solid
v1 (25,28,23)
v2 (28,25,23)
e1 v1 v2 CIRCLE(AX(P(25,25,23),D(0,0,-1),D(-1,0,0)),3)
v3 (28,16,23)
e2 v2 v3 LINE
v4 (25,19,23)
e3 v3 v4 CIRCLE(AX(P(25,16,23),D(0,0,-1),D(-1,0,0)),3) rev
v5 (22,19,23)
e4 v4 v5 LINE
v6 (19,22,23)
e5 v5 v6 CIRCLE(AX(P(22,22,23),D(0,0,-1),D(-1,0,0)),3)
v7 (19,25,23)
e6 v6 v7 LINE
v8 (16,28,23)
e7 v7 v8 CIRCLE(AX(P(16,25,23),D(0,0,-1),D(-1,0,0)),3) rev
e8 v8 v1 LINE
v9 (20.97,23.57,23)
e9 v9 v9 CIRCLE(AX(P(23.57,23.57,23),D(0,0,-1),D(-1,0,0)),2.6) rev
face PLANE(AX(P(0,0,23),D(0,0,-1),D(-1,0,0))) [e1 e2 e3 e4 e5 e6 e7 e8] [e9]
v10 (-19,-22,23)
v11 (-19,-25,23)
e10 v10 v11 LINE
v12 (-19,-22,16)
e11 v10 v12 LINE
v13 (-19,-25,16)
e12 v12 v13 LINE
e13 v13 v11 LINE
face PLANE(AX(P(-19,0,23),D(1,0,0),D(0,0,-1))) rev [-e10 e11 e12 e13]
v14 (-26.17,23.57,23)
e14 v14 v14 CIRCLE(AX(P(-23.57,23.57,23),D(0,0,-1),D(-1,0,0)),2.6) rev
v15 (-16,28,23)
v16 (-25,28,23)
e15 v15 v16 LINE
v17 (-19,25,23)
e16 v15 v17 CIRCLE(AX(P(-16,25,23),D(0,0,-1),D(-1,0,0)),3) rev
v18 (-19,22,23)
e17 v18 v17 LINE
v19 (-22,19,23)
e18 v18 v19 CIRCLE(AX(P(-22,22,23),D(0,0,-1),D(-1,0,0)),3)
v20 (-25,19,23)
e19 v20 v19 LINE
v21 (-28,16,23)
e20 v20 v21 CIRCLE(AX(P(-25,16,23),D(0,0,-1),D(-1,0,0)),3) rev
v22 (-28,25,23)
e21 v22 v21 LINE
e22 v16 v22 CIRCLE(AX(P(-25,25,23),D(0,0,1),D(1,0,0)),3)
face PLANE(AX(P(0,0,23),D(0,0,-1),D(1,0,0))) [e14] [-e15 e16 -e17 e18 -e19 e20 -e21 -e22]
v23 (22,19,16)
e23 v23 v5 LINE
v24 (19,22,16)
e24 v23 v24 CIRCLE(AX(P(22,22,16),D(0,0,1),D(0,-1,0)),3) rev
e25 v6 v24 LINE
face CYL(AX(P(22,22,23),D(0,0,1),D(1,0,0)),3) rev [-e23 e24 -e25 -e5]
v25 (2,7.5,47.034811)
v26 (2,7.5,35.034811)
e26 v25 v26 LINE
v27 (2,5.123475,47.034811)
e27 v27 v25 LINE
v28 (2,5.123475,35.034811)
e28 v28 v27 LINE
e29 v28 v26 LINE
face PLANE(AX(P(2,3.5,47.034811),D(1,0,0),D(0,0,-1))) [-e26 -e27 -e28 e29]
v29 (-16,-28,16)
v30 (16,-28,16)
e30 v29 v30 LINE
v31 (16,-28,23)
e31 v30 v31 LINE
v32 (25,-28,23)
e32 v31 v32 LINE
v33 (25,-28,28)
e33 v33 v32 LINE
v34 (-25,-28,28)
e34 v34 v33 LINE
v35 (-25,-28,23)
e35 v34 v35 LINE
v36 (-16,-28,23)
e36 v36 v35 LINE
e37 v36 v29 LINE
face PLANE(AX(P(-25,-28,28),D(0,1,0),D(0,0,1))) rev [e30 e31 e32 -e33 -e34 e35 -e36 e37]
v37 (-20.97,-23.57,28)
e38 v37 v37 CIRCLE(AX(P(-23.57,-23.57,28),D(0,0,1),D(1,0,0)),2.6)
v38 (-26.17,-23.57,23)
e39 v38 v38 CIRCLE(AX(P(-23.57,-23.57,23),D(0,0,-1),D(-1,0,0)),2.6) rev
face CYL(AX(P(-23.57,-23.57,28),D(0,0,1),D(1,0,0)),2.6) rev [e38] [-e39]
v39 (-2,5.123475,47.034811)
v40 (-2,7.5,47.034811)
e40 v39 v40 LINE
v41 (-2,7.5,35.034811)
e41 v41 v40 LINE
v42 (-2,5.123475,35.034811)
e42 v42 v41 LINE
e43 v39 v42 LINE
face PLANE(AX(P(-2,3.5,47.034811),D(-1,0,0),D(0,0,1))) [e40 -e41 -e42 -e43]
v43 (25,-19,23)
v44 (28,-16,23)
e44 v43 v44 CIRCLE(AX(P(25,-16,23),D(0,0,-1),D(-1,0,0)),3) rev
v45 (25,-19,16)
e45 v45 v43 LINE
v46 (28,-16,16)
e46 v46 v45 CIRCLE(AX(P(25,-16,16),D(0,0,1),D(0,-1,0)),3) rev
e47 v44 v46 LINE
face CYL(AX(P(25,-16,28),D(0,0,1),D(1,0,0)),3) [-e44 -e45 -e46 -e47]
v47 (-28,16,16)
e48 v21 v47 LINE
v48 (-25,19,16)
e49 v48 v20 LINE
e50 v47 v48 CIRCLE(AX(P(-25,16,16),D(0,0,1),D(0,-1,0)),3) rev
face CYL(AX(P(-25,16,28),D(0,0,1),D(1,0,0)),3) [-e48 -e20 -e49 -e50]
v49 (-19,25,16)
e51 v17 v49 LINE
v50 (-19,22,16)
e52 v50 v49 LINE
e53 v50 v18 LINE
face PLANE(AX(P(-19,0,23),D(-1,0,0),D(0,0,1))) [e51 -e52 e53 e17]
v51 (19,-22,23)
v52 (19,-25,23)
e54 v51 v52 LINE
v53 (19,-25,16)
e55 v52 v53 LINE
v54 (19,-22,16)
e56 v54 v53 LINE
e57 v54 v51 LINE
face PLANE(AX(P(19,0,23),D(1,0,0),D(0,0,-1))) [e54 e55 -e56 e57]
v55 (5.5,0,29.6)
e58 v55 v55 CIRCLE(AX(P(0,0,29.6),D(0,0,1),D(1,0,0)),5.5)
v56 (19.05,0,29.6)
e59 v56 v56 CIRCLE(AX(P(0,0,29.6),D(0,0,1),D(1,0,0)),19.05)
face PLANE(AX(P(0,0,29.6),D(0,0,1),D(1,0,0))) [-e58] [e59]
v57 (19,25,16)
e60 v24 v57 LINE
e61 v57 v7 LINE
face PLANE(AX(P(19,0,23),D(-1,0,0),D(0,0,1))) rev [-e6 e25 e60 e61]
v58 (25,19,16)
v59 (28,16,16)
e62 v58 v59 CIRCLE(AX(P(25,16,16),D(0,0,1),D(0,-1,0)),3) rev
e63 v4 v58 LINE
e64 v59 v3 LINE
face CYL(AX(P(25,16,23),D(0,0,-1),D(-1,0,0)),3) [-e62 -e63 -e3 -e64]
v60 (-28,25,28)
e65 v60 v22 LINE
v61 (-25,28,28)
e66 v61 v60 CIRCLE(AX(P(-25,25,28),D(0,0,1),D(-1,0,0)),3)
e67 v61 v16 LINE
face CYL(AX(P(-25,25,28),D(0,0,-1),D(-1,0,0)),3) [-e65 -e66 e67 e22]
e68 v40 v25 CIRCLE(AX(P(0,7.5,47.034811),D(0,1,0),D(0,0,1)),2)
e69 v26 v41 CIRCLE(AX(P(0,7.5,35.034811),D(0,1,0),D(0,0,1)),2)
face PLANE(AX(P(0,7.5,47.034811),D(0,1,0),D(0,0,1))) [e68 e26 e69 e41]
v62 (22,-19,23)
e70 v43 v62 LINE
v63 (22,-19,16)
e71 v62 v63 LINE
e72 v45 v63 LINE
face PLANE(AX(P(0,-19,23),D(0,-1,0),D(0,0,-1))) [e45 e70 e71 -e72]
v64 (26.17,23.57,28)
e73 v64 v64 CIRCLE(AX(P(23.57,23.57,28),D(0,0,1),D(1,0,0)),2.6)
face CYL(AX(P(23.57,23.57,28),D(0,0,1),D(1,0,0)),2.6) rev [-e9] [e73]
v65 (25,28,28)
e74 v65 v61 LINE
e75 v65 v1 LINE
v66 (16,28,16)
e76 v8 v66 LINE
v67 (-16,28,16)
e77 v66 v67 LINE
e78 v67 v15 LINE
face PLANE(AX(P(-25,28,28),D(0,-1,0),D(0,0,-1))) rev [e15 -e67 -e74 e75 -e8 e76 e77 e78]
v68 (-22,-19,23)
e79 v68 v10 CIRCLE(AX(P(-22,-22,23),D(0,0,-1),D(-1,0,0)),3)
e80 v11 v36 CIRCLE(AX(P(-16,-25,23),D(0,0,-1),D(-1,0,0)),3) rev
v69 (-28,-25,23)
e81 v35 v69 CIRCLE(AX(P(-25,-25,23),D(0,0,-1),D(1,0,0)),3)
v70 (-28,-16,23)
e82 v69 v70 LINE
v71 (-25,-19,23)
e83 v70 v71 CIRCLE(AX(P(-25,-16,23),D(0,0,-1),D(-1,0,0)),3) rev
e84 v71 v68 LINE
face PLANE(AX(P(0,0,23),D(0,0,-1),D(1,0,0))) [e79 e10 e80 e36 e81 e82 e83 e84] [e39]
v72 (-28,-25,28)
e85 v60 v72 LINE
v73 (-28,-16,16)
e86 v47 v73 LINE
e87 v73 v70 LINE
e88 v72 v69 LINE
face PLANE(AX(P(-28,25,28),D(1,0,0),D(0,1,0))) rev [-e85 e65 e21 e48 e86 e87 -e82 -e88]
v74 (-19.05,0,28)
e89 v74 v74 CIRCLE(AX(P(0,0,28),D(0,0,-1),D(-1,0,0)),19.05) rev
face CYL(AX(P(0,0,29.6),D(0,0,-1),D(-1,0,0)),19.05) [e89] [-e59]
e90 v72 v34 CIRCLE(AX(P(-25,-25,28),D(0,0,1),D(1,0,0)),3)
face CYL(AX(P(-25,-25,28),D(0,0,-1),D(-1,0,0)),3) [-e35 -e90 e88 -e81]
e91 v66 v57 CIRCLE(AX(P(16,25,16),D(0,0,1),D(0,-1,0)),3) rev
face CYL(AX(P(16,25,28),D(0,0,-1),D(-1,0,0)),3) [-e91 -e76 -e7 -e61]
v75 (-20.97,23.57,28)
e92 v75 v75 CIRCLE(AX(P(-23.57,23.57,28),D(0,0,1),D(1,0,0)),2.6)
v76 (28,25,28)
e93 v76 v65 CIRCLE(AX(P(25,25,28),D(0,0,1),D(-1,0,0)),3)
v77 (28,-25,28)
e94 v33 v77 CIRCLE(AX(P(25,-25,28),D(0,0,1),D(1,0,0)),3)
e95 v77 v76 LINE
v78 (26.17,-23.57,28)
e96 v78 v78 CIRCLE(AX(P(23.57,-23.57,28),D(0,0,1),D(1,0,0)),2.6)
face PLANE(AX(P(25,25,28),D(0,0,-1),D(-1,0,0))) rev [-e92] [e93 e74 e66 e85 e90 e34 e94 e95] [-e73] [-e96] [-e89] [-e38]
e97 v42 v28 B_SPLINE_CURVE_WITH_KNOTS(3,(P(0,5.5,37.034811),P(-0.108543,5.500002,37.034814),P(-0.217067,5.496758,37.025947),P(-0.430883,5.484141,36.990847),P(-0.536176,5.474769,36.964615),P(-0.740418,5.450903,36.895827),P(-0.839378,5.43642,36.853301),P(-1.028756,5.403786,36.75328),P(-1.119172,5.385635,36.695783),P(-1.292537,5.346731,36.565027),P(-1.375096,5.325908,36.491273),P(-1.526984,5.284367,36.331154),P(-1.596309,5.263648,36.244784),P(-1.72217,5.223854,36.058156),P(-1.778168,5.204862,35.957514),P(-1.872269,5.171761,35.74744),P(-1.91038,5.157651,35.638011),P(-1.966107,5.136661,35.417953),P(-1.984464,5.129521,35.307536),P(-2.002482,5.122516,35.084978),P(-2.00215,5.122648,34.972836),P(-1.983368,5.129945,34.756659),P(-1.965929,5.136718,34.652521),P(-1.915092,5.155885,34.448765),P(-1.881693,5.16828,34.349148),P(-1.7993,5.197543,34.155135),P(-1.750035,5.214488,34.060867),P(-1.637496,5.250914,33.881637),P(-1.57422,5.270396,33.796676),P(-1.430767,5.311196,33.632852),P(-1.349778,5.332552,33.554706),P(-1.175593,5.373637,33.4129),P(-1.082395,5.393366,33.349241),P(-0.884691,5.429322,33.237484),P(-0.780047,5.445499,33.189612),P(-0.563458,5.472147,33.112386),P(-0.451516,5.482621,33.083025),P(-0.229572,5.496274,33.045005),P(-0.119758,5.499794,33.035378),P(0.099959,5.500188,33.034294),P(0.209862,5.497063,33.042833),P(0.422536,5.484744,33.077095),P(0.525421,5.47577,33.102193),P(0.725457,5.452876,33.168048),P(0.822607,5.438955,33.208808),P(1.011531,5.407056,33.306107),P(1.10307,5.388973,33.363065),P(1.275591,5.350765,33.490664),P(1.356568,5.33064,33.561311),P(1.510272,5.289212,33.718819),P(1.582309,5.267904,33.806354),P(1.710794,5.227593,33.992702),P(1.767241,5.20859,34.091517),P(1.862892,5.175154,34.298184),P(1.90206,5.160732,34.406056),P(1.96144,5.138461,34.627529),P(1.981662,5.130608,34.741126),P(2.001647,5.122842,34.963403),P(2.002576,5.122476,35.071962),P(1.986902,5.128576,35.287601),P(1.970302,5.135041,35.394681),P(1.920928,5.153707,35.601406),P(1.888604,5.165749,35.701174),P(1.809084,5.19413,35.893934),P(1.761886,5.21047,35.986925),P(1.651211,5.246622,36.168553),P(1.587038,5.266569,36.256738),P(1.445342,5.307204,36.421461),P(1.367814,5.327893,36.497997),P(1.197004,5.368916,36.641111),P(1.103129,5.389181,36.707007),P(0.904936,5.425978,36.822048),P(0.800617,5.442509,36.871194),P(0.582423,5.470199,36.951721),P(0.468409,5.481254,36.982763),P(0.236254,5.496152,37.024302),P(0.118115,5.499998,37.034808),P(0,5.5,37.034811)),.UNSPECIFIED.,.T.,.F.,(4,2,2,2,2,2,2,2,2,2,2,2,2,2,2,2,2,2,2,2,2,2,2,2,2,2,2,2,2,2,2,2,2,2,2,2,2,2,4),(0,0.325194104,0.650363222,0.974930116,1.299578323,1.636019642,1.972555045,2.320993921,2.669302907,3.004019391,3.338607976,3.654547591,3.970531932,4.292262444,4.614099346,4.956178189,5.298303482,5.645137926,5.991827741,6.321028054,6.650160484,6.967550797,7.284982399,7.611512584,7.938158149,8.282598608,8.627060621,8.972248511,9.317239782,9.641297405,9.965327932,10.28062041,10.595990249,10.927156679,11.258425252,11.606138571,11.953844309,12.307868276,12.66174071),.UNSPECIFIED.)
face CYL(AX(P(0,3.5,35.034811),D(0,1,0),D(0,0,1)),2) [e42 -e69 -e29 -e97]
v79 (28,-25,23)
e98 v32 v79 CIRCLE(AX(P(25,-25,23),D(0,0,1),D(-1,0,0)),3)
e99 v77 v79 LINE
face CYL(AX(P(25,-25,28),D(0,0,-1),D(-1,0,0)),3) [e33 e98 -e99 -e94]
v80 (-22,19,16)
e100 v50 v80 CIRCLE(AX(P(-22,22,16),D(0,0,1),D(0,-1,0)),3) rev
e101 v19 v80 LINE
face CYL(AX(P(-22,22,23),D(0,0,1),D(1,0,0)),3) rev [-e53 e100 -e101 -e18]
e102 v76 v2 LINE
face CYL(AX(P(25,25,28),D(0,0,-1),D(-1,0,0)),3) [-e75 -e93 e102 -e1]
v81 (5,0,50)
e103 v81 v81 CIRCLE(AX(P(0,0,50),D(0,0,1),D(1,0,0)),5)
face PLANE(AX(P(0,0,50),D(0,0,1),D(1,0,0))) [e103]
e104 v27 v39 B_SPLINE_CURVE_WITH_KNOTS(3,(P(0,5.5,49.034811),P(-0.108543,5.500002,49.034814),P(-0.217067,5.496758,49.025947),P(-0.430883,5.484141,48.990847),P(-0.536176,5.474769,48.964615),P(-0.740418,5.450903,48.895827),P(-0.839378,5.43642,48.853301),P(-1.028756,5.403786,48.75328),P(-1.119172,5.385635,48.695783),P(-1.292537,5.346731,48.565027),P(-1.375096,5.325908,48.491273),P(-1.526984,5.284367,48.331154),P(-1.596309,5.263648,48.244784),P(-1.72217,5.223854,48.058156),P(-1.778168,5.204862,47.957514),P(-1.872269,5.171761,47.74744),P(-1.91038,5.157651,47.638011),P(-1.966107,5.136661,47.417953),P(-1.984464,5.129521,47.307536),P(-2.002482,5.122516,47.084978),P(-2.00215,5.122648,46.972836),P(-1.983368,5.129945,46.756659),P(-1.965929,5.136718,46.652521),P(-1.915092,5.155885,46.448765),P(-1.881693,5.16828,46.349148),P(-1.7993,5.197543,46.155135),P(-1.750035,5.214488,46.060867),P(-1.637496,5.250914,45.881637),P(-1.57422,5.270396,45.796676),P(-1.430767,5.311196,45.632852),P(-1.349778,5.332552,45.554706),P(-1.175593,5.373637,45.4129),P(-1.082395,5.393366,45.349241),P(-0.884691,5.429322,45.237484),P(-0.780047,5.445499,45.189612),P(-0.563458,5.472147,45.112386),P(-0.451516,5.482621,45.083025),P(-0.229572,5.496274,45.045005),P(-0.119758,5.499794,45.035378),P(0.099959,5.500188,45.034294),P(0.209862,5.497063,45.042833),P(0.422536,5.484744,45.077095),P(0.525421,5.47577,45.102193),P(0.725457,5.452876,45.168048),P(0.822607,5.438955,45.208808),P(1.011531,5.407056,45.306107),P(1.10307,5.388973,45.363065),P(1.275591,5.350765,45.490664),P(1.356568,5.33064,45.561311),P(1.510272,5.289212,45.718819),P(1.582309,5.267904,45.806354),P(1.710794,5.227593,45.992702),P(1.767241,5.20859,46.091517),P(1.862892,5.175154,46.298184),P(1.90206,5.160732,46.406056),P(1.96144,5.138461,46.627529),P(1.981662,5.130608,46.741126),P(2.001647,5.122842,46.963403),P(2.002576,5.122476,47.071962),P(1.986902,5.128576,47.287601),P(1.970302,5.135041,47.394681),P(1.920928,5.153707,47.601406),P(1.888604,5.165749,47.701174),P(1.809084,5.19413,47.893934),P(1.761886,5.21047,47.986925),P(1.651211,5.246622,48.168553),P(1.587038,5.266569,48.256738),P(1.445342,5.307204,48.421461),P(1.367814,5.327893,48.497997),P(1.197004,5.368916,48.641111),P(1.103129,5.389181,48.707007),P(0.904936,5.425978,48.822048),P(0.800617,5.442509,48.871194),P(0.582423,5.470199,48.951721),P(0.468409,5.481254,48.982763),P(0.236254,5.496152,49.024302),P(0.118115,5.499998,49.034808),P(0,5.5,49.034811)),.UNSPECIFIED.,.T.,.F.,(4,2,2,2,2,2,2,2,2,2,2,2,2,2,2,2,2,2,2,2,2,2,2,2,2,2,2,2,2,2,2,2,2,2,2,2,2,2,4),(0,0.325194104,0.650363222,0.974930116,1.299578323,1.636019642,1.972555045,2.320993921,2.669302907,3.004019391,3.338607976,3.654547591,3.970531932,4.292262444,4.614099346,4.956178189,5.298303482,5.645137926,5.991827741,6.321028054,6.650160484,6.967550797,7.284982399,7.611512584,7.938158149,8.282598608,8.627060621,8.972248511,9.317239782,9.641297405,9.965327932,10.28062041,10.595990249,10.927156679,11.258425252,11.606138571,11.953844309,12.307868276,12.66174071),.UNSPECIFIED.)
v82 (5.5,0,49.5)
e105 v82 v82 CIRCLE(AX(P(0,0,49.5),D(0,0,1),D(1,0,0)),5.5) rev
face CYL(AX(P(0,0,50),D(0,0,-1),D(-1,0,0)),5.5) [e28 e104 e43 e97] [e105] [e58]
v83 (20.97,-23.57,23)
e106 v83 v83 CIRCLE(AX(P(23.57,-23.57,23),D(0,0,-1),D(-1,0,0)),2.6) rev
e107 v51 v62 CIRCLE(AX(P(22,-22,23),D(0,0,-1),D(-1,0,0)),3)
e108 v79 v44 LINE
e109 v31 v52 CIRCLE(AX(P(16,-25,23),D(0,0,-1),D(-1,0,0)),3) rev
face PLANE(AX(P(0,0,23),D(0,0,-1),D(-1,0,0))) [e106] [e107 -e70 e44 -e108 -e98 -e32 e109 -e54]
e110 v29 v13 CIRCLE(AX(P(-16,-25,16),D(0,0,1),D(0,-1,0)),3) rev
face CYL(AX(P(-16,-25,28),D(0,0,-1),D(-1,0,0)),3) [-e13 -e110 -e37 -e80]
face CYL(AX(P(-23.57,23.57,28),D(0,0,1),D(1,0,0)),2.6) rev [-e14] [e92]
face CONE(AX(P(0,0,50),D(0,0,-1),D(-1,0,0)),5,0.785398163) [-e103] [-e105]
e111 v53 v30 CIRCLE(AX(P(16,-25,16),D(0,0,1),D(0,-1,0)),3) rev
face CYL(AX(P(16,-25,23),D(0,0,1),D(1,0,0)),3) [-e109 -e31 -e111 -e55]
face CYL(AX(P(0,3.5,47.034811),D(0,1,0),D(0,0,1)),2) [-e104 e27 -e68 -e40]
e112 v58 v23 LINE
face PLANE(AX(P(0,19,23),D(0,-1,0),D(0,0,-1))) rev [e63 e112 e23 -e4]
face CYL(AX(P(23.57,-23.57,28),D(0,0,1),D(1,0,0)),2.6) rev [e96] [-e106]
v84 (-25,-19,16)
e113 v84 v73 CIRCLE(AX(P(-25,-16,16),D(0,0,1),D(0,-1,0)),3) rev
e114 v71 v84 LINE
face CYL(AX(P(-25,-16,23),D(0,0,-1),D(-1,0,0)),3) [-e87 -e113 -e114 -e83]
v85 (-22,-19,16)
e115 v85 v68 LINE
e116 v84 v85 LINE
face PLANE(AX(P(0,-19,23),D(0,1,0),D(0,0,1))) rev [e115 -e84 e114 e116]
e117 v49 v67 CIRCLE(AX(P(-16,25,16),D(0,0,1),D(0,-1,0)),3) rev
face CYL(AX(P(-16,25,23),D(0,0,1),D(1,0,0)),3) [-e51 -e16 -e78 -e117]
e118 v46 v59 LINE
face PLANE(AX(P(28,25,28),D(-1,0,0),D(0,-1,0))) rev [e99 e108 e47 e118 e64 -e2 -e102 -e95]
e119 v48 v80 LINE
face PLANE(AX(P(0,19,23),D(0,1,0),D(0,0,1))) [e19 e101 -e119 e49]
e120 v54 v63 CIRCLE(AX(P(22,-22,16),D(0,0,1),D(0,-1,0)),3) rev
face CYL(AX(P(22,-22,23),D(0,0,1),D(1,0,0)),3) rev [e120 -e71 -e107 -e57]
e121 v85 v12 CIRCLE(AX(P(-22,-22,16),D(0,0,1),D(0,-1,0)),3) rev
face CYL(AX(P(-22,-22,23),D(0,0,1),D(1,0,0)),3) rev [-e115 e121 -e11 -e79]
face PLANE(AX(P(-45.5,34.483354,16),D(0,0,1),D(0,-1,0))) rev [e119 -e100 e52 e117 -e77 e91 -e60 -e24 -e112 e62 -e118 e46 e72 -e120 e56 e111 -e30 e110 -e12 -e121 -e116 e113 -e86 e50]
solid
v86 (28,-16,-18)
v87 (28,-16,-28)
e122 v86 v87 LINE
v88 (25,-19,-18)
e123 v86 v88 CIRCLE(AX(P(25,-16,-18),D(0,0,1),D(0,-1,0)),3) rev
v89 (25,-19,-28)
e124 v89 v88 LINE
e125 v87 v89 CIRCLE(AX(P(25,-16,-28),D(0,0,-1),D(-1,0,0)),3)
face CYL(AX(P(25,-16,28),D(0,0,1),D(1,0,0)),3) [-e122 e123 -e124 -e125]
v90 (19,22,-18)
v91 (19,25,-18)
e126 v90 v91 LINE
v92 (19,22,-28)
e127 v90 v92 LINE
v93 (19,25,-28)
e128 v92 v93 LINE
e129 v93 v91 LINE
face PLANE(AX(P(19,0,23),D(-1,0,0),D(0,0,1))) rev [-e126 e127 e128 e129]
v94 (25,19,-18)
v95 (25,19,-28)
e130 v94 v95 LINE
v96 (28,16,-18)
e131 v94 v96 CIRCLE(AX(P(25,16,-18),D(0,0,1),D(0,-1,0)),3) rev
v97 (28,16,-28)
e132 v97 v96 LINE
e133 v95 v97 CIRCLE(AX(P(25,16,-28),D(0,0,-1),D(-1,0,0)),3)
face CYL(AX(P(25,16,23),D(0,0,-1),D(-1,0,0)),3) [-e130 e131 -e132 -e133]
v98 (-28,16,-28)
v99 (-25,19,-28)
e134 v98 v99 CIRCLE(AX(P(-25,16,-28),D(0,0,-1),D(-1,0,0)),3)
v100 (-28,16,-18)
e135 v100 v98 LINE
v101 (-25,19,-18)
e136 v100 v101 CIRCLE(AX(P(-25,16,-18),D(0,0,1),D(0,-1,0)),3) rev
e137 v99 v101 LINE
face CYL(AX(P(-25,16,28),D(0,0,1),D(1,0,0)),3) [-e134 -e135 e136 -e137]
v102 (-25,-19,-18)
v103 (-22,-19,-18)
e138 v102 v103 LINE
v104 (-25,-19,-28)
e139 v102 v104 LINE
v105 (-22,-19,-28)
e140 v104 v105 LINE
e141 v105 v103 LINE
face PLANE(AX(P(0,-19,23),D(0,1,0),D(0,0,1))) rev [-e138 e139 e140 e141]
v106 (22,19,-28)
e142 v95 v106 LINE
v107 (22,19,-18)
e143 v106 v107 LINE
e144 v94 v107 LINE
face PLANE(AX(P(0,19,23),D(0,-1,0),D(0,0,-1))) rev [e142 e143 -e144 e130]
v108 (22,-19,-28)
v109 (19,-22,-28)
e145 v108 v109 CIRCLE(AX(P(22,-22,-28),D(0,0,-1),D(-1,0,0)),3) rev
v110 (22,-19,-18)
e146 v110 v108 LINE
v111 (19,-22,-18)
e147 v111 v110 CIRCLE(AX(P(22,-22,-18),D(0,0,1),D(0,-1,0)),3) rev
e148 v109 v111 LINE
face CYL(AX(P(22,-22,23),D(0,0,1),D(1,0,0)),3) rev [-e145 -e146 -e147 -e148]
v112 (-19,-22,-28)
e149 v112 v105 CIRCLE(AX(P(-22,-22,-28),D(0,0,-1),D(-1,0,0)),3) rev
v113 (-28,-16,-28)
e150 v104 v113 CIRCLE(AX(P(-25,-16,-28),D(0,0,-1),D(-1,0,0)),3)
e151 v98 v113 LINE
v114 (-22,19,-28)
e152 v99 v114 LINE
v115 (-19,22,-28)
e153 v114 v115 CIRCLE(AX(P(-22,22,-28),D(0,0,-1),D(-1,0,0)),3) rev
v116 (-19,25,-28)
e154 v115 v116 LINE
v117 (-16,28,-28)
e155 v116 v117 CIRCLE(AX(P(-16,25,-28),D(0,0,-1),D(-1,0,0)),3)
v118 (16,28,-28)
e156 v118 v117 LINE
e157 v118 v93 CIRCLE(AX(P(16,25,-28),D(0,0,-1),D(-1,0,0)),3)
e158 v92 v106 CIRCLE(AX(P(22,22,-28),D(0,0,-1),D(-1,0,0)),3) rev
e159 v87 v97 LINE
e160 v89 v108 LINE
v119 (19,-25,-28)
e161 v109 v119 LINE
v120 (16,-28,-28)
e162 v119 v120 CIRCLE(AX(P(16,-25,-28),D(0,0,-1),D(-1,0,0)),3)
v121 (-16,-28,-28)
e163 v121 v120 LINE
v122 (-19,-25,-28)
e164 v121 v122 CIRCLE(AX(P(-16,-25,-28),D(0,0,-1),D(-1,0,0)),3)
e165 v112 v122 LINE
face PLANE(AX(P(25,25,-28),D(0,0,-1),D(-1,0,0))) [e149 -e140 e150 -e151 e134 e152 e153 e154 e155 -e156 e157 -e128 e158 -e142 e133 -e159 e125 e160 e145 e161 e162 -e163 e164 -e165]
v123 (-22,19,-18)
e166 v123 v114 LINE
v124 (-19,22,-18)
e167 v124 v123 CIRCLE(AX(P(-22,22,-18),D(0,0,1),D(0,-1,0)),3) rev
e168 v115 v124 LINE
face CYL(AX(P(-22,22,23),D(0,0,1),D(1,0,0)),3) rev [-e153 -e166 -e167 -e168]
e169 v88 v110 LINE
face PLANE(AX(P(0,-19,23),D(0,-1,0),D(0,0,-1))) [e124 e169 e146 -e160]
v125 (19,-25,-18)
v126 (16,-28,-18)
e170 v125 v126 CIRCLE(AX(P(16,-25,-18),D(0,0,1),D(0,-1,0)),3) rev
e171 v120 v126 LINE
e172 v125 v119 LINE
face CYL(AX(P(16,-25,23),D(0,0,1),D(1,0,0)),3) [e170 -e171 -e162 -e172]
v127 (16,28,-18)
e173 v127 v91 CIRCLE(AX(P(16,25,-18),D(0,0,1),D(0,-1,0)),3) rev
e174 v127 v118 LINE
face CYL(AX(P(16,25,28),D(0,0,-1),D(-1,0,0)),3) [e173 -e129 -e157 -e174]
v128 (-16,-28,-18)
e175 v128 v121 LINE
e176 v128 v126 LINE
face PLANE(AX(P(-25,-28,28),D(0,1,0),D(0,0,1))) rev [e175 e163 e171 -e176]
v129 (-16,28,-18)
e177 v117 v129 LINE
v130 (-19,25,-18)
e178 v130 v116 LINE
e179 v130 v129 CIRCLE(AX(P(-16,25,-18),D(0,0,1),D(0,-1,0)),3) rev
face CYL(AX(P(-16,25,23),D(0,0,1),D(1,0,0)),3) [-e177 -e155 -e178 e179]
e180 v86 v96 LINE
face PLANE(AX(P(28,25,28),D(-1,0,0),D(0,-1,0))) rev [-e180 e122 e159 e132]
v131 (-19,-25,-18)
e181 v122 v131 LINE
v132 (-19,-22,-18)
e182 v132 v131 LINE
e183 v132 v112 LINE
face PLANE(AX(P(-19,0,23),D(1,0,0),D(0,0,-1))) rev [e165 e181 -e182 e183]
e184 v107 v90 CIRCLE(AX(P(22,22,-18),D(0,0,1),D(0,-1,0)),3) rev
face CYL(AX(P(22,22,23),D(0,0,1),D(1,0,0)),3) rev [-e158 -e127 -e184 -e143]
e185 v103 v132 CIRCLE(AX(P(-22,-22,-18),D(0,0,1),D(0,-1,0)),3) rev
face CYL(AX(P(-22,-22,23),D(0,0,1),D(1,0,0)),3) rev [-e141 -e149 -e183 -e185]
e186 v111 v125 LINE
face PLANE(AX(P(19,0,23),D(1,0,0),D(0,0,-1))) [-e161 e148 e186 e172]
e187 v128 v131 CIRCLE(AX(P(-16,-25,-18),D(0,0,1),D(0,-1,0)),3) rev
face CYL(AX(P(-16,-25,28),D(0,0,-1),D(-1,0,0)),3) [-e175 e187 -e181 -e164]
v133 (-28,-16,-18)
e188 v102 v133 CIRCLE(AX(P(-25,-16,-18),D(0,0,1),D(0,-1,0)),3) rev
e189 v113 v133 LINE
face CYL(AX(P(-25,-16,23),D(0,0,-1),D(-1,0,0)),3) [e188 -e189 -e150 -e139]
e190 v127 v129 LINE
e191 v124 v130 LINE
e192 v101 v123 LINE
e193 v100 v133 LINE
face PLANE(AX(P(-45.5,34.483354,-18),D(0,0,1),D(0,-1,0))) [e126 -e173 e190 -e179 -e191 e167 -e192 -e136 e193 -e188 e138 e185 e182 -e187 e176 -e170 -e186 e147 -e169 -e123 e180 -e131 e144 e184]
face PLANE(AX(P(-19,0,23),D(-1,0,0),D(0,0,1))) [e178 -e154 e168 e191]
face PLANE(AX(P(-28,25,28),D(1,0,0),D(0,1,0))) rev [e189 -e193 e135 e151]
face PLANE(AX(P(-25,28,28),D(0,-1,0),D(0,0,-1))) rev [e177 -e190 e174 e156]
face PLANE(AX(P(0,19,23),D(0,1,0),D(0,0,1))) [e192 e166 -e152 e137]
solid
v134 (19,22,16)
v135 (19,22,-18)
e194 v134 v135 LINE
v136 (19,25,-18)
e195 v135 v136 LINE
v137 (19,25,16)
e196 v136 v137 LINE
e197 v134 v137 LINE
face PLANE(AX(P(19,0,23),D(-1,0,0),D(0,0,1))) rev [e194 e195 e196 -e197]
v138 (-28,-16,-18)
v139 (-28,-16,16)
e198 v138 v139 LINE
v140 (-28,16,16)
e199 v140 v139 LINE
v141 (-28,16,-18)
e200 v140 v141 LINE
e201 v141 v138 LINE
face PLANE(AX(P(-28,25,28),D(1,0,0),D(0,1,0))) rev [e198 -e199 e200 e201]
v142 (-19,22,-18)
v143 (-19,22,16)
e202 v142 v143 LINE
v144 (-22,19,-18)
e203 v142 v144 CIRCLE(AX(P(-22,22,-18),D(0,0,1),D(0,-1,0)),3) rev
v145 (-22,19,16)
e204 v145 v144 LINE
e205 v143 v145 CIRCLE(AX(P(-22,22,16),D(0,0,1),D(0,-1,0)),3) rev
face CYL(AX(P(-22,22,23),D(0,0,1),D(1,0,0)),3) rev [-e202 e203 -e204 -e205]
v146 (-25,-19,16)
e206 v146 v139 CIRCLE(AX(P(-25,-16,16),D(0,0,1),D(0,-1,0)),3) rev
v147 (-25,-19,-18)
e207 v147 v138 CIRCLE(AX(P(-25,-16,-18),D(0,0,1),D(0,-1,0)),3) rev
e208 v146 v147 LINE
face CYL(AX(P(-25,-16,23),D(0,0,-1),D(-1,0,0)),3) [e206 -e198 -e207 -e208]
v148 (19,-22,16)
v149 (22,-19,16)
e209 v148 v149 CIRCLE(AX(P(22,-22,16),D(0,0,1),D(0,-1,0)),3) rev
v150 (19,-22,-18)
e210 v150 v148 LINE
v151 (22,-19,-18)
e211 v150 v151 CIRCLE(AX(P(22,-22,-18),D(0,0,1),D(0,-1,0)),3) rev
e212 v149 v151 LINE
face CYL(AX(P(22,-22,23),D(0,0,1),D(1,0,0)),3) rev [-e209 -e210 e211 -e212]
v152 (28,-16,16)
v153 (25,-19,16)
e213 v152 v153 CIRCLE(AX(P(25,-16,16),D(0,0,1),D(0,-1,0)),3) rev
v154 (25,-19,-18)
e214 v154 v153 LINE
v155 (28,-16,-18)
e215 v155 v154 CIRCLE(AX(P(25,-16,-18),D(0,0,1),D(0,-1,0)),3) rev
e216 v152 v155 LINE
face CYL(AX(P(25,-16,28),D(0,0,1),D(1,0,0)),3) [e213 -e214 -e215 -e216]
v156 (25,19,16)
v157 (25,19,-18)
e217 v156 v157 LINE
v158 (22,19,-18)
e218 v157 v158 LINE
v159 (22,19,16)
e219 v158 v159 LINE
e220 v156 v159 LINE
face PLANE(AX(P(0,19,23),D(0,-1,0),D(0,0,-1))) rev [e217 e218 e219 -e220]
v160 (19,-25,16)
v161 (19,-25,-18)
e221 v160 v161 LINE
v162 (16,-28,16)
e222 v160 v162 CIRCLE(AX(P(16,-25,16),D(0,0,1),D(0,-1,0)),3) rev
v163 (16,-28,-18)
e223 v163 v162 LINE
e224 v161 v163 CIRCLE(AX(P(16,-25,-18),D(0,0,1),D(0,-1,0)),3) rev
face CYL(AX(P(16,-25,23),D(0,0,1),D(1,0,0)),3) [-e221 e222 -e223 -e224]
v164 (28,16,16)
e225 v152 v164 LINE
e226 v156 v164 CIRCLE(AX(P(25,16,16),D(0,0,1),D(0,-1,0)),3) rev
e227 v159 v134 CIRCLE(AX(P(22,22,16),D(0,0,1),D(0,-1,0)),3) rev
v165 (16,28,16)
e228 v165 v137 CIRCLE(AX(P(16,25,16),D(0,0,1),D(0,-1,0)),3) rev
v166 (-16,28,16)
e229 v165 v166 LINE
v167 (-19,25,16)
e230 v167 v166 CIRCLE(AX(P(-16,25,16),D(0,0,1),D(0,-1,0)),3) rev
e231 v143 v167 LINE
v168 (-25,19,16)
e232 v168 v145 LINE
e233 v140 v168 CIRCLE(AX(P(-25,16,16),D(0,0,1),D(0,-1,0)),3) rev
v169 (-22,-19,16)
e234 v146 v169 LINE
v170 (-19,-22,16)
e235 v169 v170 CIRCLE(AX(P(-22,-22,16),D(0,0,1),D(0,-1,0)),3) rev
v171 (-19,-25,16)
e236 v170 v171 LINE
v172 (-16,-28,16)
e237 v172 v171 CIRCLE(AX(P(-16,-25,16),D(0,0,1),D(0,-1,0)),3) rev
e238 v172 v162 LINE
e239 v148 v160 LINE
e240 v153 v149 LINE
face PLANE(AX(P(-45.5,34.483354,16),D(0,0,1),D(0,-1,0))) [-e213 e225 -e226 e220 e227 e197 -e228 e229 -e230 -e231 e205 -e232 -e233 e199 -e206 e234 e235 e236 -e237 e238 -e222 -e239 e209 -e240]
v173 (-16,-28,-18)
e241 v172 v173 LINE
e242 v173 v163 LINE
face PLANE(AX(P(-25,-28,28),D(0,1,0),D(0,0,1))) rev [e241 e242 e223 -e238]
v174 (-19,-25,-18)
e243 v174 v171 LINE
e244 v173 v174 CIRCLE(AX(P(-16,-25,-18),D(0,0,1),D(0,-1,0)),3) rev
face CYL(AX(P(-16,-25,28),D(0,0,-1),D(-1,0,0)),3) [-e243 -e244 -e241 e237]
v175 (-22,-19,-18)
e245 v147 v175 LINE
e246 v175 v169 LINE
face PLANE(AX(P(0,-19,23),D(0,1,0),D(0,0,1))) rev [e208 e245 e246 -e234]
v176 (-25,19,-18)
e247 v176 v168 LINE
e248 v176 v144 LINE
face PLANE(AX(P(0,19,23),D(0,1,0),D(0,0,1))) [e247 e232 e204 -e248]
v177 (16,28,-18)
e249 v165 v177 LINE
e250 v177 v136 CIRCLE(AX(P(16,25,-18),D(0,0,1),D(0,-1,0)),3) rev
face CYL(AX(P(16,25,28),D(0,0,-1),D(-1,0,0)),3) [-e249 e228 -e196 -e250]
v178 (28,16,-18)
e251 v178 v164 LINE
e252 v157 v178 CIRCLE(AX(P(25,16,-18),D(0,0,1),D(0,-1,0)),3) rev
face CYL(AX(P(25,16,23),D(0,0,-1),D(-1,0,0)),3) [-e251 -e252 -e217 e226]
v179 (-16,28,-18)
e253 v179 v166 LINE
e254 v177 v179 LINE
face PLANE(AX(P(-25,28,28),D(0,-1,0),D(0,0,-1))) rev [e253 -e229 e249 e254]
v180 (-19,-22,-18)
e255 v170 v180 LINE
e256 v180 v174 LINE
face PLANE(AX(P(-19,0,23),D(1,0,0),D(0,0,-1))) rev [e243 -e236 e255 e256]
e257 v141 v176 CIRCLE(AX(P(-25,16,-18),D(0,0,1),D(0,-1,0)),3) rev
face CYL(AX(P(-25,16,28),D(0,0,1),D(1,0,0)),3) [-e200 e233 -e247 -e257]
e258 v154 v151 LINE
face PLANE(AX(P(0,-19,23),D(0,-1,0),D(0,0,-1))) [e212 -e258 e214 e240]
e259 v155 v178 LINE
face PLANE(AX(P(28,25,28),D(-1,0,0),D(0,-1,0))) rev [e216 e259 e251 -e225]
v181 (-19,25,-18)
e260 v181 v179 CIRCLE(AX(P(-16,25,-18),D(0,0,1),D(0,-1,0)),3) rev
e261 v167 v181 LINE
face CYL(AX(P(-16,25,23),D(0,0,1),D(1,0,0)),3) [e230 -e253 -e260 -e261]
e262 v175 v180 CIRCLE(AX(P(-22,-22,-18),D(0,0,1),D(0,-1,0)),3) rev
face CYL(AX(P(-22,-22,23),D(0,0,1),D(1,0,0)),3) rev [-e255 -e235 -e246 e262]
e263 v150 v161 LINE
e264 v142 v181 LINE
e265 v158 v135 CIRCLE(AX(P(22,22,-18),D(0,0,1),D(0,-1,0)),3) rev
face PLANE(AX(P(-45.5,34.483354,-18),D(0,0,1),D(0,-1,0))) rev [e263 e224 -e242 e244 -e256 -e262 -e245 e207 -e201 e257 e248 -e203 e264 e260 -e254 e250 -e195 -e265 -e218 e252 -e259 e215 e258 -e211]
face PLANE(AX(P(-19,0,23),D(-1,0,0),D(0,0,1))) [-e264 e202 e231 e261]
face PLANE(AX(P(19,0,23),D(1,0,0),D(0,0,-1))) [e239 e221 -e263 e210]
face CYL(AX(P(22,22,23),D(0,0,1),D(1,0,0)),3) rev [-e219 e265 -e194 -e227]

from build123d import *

# Parameters (mm, degrees)
SALIENTE_EXTRUIR1_DEPTH                      = 28
PERFORADOR_PARA_ROSCAR_HELICOIL_DE_M51_D     = 5.2
PERFORADOR_PARA_ROSCAR_HELICOIL_DE_M51_DEPTH = 9
PERFORADOR_PARA_ROSCAR_HELICOIL_DE_M51_TIP   = 1.562237609
CORTAR_EXTRUIR1_START                        = -51
CORTAR_EXTRUIR1_DEPTH                        = 51
SIMETR_A4_START                              = -51
SIMETR_A4_COPY_1_DEPTH                       = 51
SIMETR_A4_COPY_2_DEPTH                       = 51
REDONDEO1_R                                  = 3
CROQUIS6_R                                   = 19.05
SALIENTE_EXTRUIR2_DEPTH                      = 1.6
CROQUIS7_R                                   = 5.5
SALIENTE_EXTRUIR3_DEPTH                      = 20.4
CHAFL_N1_SIZE                                = 0.5
SALIENTE_EXTRUIR4_DEPTH                      = 2
SALIENTE_EXTRUIR4_DEPTH_BACK                 = 2
PARTIR1_START                                = -28
PARTIR1_DEPTH                                = 10
PARTIR1_2_DEPTH                              = 44
PARTIR1_START_2                              = -18
PARTIR1_3_DEPTH                              = 34


# Read off the part's stored shape, not the designer's step: Partir1
with BuildPart() as part:
    # Croquis1 → Saliente-Extruir1 (new, symmetric)
    with BuildSketch(Plane.XY):
        with BuildLine():
            Line((-25, 28), (25, 28))
            ThreePointArc((25, 28), (27.121320344, 27.121320344), (28, 25))
            Line((28, 25), (28, -25))
            ThreePointArc((28, -25), (27.121320344, -27.121320344), (25, -28))
            Line((25, -28), (-25, -28))
            ThreePointArc((-25, -28), (-27.121320344, -27.121320344), (-28, -25))
            Line((-28, -25), (-28, 25))
            ThreePointArc((-28, 25), (-27.121320344, 27.121320344), (-25, 28))
        make_face()
    extrude(amount=SALIENTE_EXTRUIR1_DEPTH, both=True)

    # Perforador para roscar Helicoil de M51
    with Locations(Plane(origin=(-23.57, 23.57, 28), x_dir=(1, 0, 0), z_dir=(0, 0, 1))):
        with Locations((0, 0), (47.14, 0), (47.14, -47.14), (0, -47.14)):
            Hole(PERFORADOR_PARA_ROSCAR_HELICOIL_DE_M51_D / 2, depth=PERFORADOR_PARA_ROSCAR_HELICOIL_DE_M51_DEPTH)
            with Locations((0, 0, -(PERFORADOR_PARA_ROSCAR_HELICOIL_DE_M51_DEPTH + PERFORADOR_PARA_ROSCAR_HELICOIL_DE_M51_TIP / 2))):  # 118° drill point
                Cone(0, PERFORADOR_PARA_ROSCAR_HELICOIL_DE_M51_D / 2, PERFORADOR_PARA_ROSCAR_HELICOIL_DE_M51_TIP, mode=Mode.SUBTRACT)

    # Croquis5 → Cortar-Extruir1 (cut)
    with BuildSketch(Plane(origin=(0, 0, -28), x_dir=(-1, 0, 0), z_dir=(0, 0, -1)).offset(CORTAR_EXTRUIR1_START)):
        with BuildLine():
            Line((-28, 25), (-28, 19))
            Line((-28, 19), (-19, 19))
            Line((-19, 19), (-19, 28))
            Line((-19, 28), (-25, 28))
            ThreePointArc((-25, 28), (-27.121320344, 27.121320344), (-28, 25))
        make_face()
    cortar_extruir1 = extrude(amount=CORTAR_EXTRUIR1_DEPTH, mode=Mode.SUBTRACT)

    # Simetría1: Cortar-Extruir1 across plane
    add(cortar_extruir1.mirror(Plane(origin=(0, 0, 0), x_dir=(0, 0, 1), z_dir=(1, 0, 0))), mode=Mode.SUBTRACT)

    # Simetría3: Cortar-Extruir1 across plane
    add(cortar_extruir1.mirror(Plane.ZX), mode=Mode.SUBTRACT)

    # Simetría4 copy 1 sketch → Simetría4 copy 1 (cut)
    with BuildSketch(Plane(origin=(0, 0, -28), x_dir=(1, 0, 0), z_dir=(0, 0, -1)).offset(SIMETR_A4_START)):
        with BuildLine():
            Line((-28, 25), (-28, 19))
            Line((-28, 19), (-19, 19))
            Line((-19, 19), (-19, 28))
            Line((-19, 28), (-25, 28))
            ThreePointArc((-25, 28), (-27.121320344, 27.121320344), (-28, 25))
        make_face()
    extrude(amount=SIMETR_A4_COPY_1_DEPTH, mode=Mode.SUBTRACT)

    # Simetría4 copy 2 sketch → Simetría4 copy 2 (cut)
    with BuildSketch(Plane(origin=(0, 0, -28), x_dir=(1, 0, 0), z_dir=(0, 0, -1)).offset(SIMETR_A4_START)):
        with BuildLine():
            Line((-28, -25), (-28, -19))
            Line((-28, -19), (-19, -19))
            Line((-19, -19), (-19, -28))
            Line((-19, -28), (-25, -28))
            ThreePointArc((-25, -28), (-27.121320344, -27.121320344), (-28, -25))
        make_face()
    extrude(amount=SIMETR_A4_COPY_2_DEPTH, mode=Mode.SUBTRACT)

    # Redondeo1
    redondeo1_edges = [part.edges().sort_by_distance(p)[0] for p in [
        (-19, -19, -2.5),
        (-28, -19, -2.5),
        (-19, -28, -2.5),
        (19, 19, -2.5),
        (28, 19, -2.5),
        (19, 28, -2.5),
        (-28, 19, -2.5),
        (-19, 19, -2.5),
        (-19, 28, -2.5),
        (28, -19, -2.5),
        (19, -19, -2.5),
        (19, -28, -2.5),
    ]]
    fillet(redondeo1_edges, radius=REDONDEO1_R)

    # Croquis6 → Saliente-Extruir2 (add)
    with BuildSketch(Plane.XY.offset(28)):
        with Locations(Location((0, 0, 0), (0, 0, 180))):
            Circle(CROQUIS6_R)
    extrude(amount=SALIENTE_EXTRUIR2_DEPTH)

    # Croquis7 → Saliente-Extruir3 (add)
    with BuildSketch(Plane.XY.offset(29.6)):
        Circle(CROQUIS7_R)
    extrude(amount=SALIENTE_EXTRUIR3_DEPTH)

    # Chaflán1
    chafl_n1_edges = [part.edges().sort_by_distance(p)[0] for p in [
        (-5.5, 0, 50),
    ]]
    chamfer(chafl_n1_edges, length=CHAFL_N1_SIZE)

    # Croquis8 → Saliente-Extruir4 (add, two sides: drawn at the far end of the back side and taken through both)
    with BuildSketch(Plane(origin=(0, 5.5, 0), x_dir=(1, 0, 0), z_dir=(0, 1, 0)).offset(-SALIENTE_EXTRUIR4_DEPTH_BACK)):
        with BuildLine():
            Line((-2, -47.034811322), (-2, -35.034811322))
            ThreePointArc((-2, -35.034811322), (0, -33.034811322), (2, -35.034811322))
            Line((2, -35.034811322), (2, -47.034811322))
            ThreePointArc((2, -47.034811322), (0, -49.034811322), (-2, -47.034811322))
        make_face()
    extrude(amount=SALIENTE_EXTRUIR4_DEPTH + SALIENTE_EXTRUIR4_DEPTH_BACK)

    # Partir1 2 outline → Partir1 2 (cut)
    with BuildSketch(Plane.XY.offset(PARTIR1_START)):
        with BuildLine():
            Line((-16, -28), (16, -28))
            ThreePointArc((16, -28), (18.121320344, -27.121320344), (19, -25))
            Line((19, -25), (19, -22))
            ThreePointArc((19, -22), (19.878679656, -19.878679656), (22, -19))
            Line((22, -19), (25, -19))
            ThreePointArc((25, -19), (27.121320344, -18.121320344), (28, -16))
            Line((28, -16), (28, 16))
            ThreePointArc((28, 16), (27.121320344, 18.121320344), (25, 19))
            Line((25, 19), (22, 19))
            ThreePointArc((22, 19), (19.878679656, 19.878679656), (19, 22))
            Line((19, 22), (19, 25))
            ThreePointArc((19, 25), (18.121320344, 27.121320344), (16, 28))
            Line((16, 28), (-16, 28))
            ThreePointArc((-16, 28), (-18.121320344, 27.121320344), (-19, 25))
            Line((-19, 25), (-19, 22))
            ThreePointArc((-19, 22), (-19.878679656, 19.878679656), (-22, 19))
            Line((-22, 19), (-25, 19))
            ThreePointArc((-25, 19), (-27.121320344, 18.121320344), (-28, 16))
            Line((-28, 16), (-28, -16))
            ThreePointArc((-28, -16), (-27.121320344, -18.121320344), (-25, -19))
            Line((-25, -19), (-22, -19))
            ThreePointArc((-22, -19), (-19.878679656, -19.878679656), (-19, -22))
            Line((-19, -22), (-19, -25))
            ThreePointArc((-19, -25), (-18.121320344, -27.121320344), (-16, -28))
        make_face()
    extrude(amount=PARTIR1_2_DEPTH, mode=Mode.SUBTRACT)


with BuildPart() as body_2:
    # Partir1 outline → Partir1 (new body)
    with BuildSketch(Plane.XY.offset(PARTIR1_START)):
        with BuildLine():
            Line((-19, -22), (-19, -25))
            ThreePointArc((-19, -25), (-18.121320344, -27.121320344), (-16, -28))
            Line((-16, -28), (16, -28))
            ThreePointArc((16, -28), (18.121320344, -27.121320344), (19, -25))
            Line((19, -25), (19, -22))
            ThreePointArc((19, -22), (19.878679656, -19.878679656), (22, -19))
            Line((22, -19), (25, -19))
            ThreePointArc((25, -19), (27.121320344, -18.121320344), (28, -16))
            Line((28, -16), (28, 16))
            ThreePointArc((28, 16), (27.121320344, 18.121320344), (25, 19))
            Line((25, 19), (22, 19))
            ThreePointArc((22, 19), (19.878679656, 19.878679656), (19, 22))
            Line((19, 22), (19, 25))
            ThreePointArc((19, 25), (18.121320344, 27.121320344), (16, 28))
            Line((16, 28), (-16, 28))
            ThreePointArc((-16, 28), (-18.121320344, 27.121320344), (-19, 25))
            Line((-19, 25), (-19, 22))
            ThreePointArc((-19, 22), (-19.878679656, 19.878679656), (-22, 19))
            Line((-22, 19), (-25, 19))
            ThreePointArc((-25, 19), (-27.121320344, 18.121320344), (-28, 16))
            Line((-28, 16), (-28, -16))
            ThreePointArc((-28, -16), (-27.121320344, -18.121320344), (-25, -19))
            Line((-25, -19), (-22, -19))
            ThreePointArc((-22, -19), (-19.878679656, -19.878679656), (-19, -22))
        make_face()
    extrude(amount=PARTIR1_DEPTH)


with BuildPart() as body_3:
    # Partir1 3 outline → Partir1 3 (new body)
    with BuildSketch(Plane.XY.offset(PARTIR1_START_2)):
        with BuildLine():
            Line((-19, -22), (-19, -25))
            ThreePointArc((-19, -25), (-18.121320344, -27.121320344), (-16, -28))
            Line((-16, -28), (16, -28))
            ThreePointArc((16, -28), (18.121320344, -27.121320344), (19, -25))
            Line((19, -25), (19, -22))
            ThreePointArc((19, -22), (19.878679656, -19.878679656), (22, -19))
            Line((22, -19), (25, -19))
            ThreePointArc((25, -19), (27.121320344, -18.121320344), (28, -16))
            Line((28, -16), (28, 16))
            ThreePointArc((28, 16), (27.121320344, 18.121320344), (25, 19))
            Line((25, 19), (22, 19))
            ThreePointArc((22, 19), (19.878679656, 19.878679656), (19, 22))
            Line((19, 22), (19, 25))
            ThreePointArc((19, 25), (18.121320344, 27.121320344), (16, 28))
            Line((16, 28), (-16, 28))
            ThreePointArc((-16, 28), (-18.121320344, 27.121320344), (-19, 25))
            Line((-19, 25), (-19, 22))
            ThreePointArc((-19, 22), (-19.878679656, 19.878679656), (-22, 19))
            Line((-22, 19), (-25, 19))
            ThreePointArc((-25, 19), (-27.121320344, 18.121320344), (-28, 16))
            Line((-28, 16), (-28, -16))
            ThreePointArc((-28, -16), (-27.121320344, -18.121320344), (-25, -19))
            Line((-25, -19), (-22, -19))
            ThreePointArc((-22, -19), (-19.878679656, -19.878679656), (-19, -22))
        make_face()
    extrude(amount=PARTIR1_3_DEPTH)


solid = Compound([part.part, body_2.part, body_3.part])
